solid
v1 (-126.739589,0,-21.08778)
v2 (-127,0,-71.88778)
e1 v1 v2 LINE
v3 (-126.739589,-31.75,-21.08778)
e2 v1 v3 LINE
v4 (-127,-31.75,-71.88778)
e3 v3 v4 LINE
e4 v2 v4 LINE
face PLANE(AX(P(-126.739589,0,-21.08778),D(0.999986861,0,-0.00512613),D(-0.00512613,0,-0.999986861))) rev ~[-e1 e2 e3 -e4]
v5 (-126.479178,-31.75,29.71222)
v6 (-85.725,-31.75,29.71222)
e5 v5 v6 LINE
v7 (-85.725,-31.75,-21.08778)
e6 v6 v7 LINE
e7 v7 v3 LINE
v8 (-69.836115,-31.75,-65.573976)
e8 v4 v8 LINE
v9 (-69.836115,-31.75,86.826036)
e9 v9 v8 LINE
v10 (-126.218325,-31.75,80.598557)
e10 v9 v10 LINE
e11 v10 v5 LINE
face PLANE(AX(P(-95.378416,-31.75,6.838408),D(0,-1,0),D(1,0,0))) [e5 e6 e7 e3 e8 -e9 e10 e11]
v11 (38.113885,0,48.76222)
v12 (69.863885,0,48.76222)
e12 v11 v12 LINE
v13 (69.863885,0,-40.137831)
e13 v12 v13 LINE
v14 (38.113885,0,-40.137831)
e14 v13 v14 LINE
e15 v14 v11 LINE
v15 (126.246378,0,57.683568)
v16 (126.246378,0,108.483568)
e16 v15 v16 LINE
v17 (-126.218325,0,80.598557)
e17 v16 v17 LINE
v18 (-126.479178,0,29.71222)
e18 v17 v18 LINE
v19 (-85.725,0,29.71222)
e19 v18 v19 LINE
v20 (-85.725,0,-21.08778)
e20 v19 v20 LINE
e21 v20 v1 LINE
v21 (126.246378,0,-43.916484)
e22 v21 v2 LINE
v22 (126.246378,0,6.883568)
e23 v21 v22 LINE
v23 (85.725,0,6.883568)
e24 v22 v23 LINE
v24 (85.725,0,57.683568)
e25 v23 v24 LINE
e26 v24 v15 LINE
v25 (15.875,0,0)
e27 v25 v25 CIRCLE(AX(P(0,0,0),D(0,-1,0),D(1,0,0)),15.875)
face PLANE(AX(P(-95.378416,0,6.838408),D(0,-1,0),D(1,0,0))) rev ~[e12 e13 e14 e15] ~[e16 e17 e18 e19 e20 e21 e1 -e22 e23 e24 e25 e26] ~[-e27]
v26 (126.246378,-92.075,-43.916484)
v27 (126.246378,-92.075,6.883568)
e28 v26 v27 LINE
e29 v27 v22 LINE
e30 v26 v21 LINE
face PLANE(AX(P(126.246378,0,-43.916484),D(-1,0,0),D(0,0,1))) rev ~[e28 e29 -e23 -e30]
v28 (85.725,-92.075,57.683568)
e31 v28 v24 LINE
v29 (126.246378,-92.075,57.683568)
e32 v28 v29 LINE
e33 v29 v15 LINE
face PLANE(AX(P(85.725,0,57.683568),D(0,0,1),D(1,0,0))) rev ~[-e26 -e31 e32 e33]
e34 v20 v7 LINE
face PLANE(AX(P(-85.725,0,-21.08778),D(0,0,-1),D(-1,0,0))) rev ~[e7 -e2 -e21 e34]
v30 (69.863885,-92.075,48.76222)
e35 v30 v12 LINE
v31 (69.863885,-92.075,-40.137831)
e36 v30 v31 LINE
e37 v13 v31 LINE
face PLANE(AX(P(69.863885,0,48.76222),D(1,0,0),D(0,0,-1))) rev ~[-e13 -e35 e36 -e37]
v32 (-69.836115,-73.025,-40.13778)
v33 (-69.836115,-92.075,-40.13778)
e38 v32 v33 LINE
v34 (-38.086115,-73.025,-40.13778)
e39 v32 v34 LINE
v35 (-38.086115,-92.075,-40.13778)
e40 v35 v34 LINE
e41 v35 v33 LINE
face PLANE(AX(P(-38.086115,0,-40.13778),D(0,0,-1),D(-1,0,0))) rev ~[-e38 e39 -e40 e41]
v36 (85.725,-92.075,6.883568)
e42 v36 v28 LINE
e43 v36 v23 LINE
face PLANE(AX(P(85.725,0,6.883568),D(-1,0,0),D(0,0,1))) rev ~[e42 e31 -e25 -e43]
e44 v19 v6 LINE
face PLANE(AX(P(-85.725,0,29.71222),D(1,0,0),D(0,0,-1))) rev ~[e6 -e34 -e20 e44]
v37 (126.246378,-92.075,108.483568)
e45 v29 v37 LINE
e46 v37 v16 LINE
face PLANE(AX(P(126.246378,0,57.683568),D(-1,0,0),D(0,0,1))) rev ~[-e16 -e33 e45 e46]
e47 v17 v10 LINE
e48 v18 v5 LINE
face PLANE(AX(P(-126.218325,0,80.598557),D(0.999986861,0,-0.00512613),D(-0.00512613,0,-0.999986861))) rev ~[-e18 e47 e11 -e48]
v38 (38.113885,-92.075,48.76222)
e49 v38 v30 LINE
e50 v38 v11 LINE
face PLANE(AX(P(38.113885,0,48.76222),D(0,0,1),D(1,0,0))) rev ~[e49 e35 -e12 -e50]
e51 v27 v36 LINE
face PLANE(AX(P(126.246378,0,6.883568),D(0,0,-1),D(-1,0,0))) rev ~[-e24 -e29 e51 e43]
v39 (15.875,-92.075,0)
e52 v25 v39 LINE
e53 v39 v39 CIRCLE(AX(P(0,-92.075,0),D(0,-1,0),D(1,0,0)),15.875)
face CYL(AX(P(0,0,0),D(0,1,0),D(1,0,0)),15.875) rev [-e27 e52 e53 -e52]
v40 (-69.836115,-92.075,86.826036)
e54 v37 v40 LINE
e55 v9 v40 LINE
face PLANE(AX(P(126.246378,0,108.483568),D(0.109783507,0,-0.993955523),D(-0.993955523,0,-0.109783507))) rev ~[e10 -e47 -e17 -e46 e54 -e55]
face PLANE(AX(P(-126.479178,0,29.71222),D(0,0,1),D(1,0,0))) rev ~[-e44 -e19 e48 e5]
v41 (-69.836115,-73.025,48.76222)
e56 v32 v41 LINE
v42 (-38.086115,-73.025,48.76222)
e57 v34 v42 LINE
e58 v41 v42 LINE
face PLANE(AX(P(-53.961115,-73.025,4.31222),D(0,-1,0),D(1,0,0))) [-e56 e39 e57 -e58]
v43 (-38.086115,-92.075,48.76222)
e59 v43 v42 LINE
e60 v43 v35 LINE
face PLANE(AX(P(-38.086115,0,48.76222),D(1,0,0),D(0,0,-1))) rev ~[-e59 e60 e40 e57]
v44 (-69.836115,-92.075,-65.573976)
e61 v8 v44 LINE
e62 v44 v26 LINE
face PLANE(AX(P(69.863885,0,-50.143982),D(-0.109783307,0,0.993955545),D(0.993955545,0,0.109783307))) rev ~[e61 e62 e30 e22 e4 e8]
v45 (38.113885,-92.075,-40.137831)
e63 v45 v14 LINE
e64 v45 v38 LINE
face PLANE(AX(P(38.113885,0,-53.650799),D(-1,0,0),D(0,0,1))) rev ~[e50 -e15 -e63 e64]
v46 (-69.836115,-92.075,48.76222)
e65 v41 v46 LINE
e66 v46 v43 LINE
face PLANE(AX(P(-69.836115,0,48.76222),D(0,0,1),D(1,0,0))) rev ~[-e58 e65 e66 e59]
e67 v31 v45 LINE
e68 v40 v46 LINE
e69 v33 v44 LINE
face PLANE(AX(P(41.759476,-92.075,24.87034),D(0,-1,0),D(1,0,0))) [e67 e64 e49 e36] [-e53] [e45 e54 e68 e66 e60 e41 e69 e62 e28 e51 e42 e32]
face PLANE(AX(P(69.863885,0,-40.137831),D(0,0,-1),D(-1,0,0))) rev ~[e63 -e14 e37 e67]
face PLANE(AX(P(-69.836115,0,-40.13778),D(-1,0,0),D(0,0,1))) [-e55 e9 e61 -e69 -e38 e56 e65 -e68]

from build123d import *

# Parameters (mm, degrees)
F0_R     = 15.875
F1_DEPTH = 31.75
F2_DEPTH = 92.075
F0_W     = 31.75
F0_H     = 88.9
F3_DEPTH = 73.025
F4_DEPTH = 53.975


# Not quite as in the source:
# - a feature names something its author has since deleted; it is built from what else it names


with BuildPart() as f1:
    # F0 (on Front) → F1 (new body)
    with BuildSketch(Plane.XZ):
        Polygon((-69.8361151936, 86.826035718), (-126.218325014, 80.5985571647), (-126.4791783958, 29.7122203269), (-85.725, 29.7122203269), (-85.725, -21.0877796731), (-126.7395891979, -21.0877796731), (-127, -71.8877796731), (-69.8361151936, -65.5739758634), (-69.8361151936, -40.1377796731), (-69.8361151936, 48.7622203269), align=None)
        Polygon((126.2463778257, 108.4835678339), (-69.8361151936, 86.826035718), (-69.8361151936, 48.7622203269), (-38.0861151936, 48.7622203269), (-38.0861151936, -40.1377796731), (-38.0861151936, -62.0671590745), (38.1138848064, -53.6507987812), (38.1138848064, -40.1378311361), (38.1138848064, 48.7622203269), (69.8638848064, 48.7622203269), (69.8638848064, -40.1378311361), (69.8638848064, -50.1439819923), (126.2463778257, -43.9164836263), (126.2463778257, 6.8835678339), (85.725, 6.8835678339), (85.725, 57.6835678339), (126.2463778257, 57.6835678339), align=None)
        Circle(F0_R, mode=Mode.SUBTRACT)
        Polygon((-38.0861151936, -40.1377796731), (-69.8361151936, -40.1377796731), (-69.8361151936, -65.5739758634), (-38.0861151936, -62.0671590745), align=None)
    extrude(amount=F1_DEPTH)

    # F0 (on Front) → F2 (join)
    with BuildSketch(Plane.XZ):
        Polygon((126.2463778257, 108.4835678339), (-69.8361151936, 86.826035718), (-69.8361151936, 48.7622203269), (-38.0861151936, 48.7622203269), (-38.0861151936, -40.1377796731), (-38.0861151936, -62.0671590745), (38.1138848064, -53.6507987812), (38.1138848064, -40.1378311361), (38.1138848064, 48.7622203269), (69.8638848064, 48.7622203269), (69.8638848064, -40.1378311361), (69.8638848064, -50.1439819923), (126.2463778257, -43.9164836263), (126.2463778257, 6.8835678339), (85.725, 6.8835678339), (85.725, 57.6835678339), (126.2463778257, 57.6835678339), align=None)
        Circle(F0_R, mode=Mode.SUBTRACT)
        Polygon((-38.0861151936, -40.1377796731), (-69.8361151936, -40.1377796731), (-69.8361151936, -65.5739758634), (-38.0861151936, -62.0671590745), align=None)
        Polygon((38.1138848064, -40.1378311361), (38.1138848064, -53.6507987812), (69.8638848064, -50.1439819923), (69.8638848064, -40.1378311361), align=None)
    extrude(amount=F2_DEPTH)

    # F0 (on Front) → F3 (join)
    with BuildSketch(Plane.XZ):
        with Locations((-53.9611151936, 4.3122203269)):
            Rectangle(F0_W, F0_H)
    extrude(amount=F3_DEPTH)

    # F0 (on Front) → F4 (join)
    with BuildSketch(Plane.XZ):
        Polygon((126.2463778257, 108.4835678339), (-69.8361151936, 86.826035718), (-69.8361151936, 48.7622203269), (-38.0861151936, 48.7622203269), (-38.0861151936, -40.1377796731), (-38.0861151936, -62.0671590745), (38.1138848064, -53.6507987812), (38.1138848064, -40.1378311361), (38.1138848064, 48.7622203269), (69.8638848064, 48.7622203269), (69.8638848064, -40.1378311361), (69.8638848064, -50.1439819923), (126.2463778257, -43.9164836263), (126.2463778257, 6.8835678339), (85.725, 6.8835678339), (85.725, 57.6835678339), (126.2463778257, 57.6835678339), align=None)
        Circle(F0_R, mode=Mode.SUBTRACT)
    extrude(amount=F4_DEPTH)


solid = f1.part
